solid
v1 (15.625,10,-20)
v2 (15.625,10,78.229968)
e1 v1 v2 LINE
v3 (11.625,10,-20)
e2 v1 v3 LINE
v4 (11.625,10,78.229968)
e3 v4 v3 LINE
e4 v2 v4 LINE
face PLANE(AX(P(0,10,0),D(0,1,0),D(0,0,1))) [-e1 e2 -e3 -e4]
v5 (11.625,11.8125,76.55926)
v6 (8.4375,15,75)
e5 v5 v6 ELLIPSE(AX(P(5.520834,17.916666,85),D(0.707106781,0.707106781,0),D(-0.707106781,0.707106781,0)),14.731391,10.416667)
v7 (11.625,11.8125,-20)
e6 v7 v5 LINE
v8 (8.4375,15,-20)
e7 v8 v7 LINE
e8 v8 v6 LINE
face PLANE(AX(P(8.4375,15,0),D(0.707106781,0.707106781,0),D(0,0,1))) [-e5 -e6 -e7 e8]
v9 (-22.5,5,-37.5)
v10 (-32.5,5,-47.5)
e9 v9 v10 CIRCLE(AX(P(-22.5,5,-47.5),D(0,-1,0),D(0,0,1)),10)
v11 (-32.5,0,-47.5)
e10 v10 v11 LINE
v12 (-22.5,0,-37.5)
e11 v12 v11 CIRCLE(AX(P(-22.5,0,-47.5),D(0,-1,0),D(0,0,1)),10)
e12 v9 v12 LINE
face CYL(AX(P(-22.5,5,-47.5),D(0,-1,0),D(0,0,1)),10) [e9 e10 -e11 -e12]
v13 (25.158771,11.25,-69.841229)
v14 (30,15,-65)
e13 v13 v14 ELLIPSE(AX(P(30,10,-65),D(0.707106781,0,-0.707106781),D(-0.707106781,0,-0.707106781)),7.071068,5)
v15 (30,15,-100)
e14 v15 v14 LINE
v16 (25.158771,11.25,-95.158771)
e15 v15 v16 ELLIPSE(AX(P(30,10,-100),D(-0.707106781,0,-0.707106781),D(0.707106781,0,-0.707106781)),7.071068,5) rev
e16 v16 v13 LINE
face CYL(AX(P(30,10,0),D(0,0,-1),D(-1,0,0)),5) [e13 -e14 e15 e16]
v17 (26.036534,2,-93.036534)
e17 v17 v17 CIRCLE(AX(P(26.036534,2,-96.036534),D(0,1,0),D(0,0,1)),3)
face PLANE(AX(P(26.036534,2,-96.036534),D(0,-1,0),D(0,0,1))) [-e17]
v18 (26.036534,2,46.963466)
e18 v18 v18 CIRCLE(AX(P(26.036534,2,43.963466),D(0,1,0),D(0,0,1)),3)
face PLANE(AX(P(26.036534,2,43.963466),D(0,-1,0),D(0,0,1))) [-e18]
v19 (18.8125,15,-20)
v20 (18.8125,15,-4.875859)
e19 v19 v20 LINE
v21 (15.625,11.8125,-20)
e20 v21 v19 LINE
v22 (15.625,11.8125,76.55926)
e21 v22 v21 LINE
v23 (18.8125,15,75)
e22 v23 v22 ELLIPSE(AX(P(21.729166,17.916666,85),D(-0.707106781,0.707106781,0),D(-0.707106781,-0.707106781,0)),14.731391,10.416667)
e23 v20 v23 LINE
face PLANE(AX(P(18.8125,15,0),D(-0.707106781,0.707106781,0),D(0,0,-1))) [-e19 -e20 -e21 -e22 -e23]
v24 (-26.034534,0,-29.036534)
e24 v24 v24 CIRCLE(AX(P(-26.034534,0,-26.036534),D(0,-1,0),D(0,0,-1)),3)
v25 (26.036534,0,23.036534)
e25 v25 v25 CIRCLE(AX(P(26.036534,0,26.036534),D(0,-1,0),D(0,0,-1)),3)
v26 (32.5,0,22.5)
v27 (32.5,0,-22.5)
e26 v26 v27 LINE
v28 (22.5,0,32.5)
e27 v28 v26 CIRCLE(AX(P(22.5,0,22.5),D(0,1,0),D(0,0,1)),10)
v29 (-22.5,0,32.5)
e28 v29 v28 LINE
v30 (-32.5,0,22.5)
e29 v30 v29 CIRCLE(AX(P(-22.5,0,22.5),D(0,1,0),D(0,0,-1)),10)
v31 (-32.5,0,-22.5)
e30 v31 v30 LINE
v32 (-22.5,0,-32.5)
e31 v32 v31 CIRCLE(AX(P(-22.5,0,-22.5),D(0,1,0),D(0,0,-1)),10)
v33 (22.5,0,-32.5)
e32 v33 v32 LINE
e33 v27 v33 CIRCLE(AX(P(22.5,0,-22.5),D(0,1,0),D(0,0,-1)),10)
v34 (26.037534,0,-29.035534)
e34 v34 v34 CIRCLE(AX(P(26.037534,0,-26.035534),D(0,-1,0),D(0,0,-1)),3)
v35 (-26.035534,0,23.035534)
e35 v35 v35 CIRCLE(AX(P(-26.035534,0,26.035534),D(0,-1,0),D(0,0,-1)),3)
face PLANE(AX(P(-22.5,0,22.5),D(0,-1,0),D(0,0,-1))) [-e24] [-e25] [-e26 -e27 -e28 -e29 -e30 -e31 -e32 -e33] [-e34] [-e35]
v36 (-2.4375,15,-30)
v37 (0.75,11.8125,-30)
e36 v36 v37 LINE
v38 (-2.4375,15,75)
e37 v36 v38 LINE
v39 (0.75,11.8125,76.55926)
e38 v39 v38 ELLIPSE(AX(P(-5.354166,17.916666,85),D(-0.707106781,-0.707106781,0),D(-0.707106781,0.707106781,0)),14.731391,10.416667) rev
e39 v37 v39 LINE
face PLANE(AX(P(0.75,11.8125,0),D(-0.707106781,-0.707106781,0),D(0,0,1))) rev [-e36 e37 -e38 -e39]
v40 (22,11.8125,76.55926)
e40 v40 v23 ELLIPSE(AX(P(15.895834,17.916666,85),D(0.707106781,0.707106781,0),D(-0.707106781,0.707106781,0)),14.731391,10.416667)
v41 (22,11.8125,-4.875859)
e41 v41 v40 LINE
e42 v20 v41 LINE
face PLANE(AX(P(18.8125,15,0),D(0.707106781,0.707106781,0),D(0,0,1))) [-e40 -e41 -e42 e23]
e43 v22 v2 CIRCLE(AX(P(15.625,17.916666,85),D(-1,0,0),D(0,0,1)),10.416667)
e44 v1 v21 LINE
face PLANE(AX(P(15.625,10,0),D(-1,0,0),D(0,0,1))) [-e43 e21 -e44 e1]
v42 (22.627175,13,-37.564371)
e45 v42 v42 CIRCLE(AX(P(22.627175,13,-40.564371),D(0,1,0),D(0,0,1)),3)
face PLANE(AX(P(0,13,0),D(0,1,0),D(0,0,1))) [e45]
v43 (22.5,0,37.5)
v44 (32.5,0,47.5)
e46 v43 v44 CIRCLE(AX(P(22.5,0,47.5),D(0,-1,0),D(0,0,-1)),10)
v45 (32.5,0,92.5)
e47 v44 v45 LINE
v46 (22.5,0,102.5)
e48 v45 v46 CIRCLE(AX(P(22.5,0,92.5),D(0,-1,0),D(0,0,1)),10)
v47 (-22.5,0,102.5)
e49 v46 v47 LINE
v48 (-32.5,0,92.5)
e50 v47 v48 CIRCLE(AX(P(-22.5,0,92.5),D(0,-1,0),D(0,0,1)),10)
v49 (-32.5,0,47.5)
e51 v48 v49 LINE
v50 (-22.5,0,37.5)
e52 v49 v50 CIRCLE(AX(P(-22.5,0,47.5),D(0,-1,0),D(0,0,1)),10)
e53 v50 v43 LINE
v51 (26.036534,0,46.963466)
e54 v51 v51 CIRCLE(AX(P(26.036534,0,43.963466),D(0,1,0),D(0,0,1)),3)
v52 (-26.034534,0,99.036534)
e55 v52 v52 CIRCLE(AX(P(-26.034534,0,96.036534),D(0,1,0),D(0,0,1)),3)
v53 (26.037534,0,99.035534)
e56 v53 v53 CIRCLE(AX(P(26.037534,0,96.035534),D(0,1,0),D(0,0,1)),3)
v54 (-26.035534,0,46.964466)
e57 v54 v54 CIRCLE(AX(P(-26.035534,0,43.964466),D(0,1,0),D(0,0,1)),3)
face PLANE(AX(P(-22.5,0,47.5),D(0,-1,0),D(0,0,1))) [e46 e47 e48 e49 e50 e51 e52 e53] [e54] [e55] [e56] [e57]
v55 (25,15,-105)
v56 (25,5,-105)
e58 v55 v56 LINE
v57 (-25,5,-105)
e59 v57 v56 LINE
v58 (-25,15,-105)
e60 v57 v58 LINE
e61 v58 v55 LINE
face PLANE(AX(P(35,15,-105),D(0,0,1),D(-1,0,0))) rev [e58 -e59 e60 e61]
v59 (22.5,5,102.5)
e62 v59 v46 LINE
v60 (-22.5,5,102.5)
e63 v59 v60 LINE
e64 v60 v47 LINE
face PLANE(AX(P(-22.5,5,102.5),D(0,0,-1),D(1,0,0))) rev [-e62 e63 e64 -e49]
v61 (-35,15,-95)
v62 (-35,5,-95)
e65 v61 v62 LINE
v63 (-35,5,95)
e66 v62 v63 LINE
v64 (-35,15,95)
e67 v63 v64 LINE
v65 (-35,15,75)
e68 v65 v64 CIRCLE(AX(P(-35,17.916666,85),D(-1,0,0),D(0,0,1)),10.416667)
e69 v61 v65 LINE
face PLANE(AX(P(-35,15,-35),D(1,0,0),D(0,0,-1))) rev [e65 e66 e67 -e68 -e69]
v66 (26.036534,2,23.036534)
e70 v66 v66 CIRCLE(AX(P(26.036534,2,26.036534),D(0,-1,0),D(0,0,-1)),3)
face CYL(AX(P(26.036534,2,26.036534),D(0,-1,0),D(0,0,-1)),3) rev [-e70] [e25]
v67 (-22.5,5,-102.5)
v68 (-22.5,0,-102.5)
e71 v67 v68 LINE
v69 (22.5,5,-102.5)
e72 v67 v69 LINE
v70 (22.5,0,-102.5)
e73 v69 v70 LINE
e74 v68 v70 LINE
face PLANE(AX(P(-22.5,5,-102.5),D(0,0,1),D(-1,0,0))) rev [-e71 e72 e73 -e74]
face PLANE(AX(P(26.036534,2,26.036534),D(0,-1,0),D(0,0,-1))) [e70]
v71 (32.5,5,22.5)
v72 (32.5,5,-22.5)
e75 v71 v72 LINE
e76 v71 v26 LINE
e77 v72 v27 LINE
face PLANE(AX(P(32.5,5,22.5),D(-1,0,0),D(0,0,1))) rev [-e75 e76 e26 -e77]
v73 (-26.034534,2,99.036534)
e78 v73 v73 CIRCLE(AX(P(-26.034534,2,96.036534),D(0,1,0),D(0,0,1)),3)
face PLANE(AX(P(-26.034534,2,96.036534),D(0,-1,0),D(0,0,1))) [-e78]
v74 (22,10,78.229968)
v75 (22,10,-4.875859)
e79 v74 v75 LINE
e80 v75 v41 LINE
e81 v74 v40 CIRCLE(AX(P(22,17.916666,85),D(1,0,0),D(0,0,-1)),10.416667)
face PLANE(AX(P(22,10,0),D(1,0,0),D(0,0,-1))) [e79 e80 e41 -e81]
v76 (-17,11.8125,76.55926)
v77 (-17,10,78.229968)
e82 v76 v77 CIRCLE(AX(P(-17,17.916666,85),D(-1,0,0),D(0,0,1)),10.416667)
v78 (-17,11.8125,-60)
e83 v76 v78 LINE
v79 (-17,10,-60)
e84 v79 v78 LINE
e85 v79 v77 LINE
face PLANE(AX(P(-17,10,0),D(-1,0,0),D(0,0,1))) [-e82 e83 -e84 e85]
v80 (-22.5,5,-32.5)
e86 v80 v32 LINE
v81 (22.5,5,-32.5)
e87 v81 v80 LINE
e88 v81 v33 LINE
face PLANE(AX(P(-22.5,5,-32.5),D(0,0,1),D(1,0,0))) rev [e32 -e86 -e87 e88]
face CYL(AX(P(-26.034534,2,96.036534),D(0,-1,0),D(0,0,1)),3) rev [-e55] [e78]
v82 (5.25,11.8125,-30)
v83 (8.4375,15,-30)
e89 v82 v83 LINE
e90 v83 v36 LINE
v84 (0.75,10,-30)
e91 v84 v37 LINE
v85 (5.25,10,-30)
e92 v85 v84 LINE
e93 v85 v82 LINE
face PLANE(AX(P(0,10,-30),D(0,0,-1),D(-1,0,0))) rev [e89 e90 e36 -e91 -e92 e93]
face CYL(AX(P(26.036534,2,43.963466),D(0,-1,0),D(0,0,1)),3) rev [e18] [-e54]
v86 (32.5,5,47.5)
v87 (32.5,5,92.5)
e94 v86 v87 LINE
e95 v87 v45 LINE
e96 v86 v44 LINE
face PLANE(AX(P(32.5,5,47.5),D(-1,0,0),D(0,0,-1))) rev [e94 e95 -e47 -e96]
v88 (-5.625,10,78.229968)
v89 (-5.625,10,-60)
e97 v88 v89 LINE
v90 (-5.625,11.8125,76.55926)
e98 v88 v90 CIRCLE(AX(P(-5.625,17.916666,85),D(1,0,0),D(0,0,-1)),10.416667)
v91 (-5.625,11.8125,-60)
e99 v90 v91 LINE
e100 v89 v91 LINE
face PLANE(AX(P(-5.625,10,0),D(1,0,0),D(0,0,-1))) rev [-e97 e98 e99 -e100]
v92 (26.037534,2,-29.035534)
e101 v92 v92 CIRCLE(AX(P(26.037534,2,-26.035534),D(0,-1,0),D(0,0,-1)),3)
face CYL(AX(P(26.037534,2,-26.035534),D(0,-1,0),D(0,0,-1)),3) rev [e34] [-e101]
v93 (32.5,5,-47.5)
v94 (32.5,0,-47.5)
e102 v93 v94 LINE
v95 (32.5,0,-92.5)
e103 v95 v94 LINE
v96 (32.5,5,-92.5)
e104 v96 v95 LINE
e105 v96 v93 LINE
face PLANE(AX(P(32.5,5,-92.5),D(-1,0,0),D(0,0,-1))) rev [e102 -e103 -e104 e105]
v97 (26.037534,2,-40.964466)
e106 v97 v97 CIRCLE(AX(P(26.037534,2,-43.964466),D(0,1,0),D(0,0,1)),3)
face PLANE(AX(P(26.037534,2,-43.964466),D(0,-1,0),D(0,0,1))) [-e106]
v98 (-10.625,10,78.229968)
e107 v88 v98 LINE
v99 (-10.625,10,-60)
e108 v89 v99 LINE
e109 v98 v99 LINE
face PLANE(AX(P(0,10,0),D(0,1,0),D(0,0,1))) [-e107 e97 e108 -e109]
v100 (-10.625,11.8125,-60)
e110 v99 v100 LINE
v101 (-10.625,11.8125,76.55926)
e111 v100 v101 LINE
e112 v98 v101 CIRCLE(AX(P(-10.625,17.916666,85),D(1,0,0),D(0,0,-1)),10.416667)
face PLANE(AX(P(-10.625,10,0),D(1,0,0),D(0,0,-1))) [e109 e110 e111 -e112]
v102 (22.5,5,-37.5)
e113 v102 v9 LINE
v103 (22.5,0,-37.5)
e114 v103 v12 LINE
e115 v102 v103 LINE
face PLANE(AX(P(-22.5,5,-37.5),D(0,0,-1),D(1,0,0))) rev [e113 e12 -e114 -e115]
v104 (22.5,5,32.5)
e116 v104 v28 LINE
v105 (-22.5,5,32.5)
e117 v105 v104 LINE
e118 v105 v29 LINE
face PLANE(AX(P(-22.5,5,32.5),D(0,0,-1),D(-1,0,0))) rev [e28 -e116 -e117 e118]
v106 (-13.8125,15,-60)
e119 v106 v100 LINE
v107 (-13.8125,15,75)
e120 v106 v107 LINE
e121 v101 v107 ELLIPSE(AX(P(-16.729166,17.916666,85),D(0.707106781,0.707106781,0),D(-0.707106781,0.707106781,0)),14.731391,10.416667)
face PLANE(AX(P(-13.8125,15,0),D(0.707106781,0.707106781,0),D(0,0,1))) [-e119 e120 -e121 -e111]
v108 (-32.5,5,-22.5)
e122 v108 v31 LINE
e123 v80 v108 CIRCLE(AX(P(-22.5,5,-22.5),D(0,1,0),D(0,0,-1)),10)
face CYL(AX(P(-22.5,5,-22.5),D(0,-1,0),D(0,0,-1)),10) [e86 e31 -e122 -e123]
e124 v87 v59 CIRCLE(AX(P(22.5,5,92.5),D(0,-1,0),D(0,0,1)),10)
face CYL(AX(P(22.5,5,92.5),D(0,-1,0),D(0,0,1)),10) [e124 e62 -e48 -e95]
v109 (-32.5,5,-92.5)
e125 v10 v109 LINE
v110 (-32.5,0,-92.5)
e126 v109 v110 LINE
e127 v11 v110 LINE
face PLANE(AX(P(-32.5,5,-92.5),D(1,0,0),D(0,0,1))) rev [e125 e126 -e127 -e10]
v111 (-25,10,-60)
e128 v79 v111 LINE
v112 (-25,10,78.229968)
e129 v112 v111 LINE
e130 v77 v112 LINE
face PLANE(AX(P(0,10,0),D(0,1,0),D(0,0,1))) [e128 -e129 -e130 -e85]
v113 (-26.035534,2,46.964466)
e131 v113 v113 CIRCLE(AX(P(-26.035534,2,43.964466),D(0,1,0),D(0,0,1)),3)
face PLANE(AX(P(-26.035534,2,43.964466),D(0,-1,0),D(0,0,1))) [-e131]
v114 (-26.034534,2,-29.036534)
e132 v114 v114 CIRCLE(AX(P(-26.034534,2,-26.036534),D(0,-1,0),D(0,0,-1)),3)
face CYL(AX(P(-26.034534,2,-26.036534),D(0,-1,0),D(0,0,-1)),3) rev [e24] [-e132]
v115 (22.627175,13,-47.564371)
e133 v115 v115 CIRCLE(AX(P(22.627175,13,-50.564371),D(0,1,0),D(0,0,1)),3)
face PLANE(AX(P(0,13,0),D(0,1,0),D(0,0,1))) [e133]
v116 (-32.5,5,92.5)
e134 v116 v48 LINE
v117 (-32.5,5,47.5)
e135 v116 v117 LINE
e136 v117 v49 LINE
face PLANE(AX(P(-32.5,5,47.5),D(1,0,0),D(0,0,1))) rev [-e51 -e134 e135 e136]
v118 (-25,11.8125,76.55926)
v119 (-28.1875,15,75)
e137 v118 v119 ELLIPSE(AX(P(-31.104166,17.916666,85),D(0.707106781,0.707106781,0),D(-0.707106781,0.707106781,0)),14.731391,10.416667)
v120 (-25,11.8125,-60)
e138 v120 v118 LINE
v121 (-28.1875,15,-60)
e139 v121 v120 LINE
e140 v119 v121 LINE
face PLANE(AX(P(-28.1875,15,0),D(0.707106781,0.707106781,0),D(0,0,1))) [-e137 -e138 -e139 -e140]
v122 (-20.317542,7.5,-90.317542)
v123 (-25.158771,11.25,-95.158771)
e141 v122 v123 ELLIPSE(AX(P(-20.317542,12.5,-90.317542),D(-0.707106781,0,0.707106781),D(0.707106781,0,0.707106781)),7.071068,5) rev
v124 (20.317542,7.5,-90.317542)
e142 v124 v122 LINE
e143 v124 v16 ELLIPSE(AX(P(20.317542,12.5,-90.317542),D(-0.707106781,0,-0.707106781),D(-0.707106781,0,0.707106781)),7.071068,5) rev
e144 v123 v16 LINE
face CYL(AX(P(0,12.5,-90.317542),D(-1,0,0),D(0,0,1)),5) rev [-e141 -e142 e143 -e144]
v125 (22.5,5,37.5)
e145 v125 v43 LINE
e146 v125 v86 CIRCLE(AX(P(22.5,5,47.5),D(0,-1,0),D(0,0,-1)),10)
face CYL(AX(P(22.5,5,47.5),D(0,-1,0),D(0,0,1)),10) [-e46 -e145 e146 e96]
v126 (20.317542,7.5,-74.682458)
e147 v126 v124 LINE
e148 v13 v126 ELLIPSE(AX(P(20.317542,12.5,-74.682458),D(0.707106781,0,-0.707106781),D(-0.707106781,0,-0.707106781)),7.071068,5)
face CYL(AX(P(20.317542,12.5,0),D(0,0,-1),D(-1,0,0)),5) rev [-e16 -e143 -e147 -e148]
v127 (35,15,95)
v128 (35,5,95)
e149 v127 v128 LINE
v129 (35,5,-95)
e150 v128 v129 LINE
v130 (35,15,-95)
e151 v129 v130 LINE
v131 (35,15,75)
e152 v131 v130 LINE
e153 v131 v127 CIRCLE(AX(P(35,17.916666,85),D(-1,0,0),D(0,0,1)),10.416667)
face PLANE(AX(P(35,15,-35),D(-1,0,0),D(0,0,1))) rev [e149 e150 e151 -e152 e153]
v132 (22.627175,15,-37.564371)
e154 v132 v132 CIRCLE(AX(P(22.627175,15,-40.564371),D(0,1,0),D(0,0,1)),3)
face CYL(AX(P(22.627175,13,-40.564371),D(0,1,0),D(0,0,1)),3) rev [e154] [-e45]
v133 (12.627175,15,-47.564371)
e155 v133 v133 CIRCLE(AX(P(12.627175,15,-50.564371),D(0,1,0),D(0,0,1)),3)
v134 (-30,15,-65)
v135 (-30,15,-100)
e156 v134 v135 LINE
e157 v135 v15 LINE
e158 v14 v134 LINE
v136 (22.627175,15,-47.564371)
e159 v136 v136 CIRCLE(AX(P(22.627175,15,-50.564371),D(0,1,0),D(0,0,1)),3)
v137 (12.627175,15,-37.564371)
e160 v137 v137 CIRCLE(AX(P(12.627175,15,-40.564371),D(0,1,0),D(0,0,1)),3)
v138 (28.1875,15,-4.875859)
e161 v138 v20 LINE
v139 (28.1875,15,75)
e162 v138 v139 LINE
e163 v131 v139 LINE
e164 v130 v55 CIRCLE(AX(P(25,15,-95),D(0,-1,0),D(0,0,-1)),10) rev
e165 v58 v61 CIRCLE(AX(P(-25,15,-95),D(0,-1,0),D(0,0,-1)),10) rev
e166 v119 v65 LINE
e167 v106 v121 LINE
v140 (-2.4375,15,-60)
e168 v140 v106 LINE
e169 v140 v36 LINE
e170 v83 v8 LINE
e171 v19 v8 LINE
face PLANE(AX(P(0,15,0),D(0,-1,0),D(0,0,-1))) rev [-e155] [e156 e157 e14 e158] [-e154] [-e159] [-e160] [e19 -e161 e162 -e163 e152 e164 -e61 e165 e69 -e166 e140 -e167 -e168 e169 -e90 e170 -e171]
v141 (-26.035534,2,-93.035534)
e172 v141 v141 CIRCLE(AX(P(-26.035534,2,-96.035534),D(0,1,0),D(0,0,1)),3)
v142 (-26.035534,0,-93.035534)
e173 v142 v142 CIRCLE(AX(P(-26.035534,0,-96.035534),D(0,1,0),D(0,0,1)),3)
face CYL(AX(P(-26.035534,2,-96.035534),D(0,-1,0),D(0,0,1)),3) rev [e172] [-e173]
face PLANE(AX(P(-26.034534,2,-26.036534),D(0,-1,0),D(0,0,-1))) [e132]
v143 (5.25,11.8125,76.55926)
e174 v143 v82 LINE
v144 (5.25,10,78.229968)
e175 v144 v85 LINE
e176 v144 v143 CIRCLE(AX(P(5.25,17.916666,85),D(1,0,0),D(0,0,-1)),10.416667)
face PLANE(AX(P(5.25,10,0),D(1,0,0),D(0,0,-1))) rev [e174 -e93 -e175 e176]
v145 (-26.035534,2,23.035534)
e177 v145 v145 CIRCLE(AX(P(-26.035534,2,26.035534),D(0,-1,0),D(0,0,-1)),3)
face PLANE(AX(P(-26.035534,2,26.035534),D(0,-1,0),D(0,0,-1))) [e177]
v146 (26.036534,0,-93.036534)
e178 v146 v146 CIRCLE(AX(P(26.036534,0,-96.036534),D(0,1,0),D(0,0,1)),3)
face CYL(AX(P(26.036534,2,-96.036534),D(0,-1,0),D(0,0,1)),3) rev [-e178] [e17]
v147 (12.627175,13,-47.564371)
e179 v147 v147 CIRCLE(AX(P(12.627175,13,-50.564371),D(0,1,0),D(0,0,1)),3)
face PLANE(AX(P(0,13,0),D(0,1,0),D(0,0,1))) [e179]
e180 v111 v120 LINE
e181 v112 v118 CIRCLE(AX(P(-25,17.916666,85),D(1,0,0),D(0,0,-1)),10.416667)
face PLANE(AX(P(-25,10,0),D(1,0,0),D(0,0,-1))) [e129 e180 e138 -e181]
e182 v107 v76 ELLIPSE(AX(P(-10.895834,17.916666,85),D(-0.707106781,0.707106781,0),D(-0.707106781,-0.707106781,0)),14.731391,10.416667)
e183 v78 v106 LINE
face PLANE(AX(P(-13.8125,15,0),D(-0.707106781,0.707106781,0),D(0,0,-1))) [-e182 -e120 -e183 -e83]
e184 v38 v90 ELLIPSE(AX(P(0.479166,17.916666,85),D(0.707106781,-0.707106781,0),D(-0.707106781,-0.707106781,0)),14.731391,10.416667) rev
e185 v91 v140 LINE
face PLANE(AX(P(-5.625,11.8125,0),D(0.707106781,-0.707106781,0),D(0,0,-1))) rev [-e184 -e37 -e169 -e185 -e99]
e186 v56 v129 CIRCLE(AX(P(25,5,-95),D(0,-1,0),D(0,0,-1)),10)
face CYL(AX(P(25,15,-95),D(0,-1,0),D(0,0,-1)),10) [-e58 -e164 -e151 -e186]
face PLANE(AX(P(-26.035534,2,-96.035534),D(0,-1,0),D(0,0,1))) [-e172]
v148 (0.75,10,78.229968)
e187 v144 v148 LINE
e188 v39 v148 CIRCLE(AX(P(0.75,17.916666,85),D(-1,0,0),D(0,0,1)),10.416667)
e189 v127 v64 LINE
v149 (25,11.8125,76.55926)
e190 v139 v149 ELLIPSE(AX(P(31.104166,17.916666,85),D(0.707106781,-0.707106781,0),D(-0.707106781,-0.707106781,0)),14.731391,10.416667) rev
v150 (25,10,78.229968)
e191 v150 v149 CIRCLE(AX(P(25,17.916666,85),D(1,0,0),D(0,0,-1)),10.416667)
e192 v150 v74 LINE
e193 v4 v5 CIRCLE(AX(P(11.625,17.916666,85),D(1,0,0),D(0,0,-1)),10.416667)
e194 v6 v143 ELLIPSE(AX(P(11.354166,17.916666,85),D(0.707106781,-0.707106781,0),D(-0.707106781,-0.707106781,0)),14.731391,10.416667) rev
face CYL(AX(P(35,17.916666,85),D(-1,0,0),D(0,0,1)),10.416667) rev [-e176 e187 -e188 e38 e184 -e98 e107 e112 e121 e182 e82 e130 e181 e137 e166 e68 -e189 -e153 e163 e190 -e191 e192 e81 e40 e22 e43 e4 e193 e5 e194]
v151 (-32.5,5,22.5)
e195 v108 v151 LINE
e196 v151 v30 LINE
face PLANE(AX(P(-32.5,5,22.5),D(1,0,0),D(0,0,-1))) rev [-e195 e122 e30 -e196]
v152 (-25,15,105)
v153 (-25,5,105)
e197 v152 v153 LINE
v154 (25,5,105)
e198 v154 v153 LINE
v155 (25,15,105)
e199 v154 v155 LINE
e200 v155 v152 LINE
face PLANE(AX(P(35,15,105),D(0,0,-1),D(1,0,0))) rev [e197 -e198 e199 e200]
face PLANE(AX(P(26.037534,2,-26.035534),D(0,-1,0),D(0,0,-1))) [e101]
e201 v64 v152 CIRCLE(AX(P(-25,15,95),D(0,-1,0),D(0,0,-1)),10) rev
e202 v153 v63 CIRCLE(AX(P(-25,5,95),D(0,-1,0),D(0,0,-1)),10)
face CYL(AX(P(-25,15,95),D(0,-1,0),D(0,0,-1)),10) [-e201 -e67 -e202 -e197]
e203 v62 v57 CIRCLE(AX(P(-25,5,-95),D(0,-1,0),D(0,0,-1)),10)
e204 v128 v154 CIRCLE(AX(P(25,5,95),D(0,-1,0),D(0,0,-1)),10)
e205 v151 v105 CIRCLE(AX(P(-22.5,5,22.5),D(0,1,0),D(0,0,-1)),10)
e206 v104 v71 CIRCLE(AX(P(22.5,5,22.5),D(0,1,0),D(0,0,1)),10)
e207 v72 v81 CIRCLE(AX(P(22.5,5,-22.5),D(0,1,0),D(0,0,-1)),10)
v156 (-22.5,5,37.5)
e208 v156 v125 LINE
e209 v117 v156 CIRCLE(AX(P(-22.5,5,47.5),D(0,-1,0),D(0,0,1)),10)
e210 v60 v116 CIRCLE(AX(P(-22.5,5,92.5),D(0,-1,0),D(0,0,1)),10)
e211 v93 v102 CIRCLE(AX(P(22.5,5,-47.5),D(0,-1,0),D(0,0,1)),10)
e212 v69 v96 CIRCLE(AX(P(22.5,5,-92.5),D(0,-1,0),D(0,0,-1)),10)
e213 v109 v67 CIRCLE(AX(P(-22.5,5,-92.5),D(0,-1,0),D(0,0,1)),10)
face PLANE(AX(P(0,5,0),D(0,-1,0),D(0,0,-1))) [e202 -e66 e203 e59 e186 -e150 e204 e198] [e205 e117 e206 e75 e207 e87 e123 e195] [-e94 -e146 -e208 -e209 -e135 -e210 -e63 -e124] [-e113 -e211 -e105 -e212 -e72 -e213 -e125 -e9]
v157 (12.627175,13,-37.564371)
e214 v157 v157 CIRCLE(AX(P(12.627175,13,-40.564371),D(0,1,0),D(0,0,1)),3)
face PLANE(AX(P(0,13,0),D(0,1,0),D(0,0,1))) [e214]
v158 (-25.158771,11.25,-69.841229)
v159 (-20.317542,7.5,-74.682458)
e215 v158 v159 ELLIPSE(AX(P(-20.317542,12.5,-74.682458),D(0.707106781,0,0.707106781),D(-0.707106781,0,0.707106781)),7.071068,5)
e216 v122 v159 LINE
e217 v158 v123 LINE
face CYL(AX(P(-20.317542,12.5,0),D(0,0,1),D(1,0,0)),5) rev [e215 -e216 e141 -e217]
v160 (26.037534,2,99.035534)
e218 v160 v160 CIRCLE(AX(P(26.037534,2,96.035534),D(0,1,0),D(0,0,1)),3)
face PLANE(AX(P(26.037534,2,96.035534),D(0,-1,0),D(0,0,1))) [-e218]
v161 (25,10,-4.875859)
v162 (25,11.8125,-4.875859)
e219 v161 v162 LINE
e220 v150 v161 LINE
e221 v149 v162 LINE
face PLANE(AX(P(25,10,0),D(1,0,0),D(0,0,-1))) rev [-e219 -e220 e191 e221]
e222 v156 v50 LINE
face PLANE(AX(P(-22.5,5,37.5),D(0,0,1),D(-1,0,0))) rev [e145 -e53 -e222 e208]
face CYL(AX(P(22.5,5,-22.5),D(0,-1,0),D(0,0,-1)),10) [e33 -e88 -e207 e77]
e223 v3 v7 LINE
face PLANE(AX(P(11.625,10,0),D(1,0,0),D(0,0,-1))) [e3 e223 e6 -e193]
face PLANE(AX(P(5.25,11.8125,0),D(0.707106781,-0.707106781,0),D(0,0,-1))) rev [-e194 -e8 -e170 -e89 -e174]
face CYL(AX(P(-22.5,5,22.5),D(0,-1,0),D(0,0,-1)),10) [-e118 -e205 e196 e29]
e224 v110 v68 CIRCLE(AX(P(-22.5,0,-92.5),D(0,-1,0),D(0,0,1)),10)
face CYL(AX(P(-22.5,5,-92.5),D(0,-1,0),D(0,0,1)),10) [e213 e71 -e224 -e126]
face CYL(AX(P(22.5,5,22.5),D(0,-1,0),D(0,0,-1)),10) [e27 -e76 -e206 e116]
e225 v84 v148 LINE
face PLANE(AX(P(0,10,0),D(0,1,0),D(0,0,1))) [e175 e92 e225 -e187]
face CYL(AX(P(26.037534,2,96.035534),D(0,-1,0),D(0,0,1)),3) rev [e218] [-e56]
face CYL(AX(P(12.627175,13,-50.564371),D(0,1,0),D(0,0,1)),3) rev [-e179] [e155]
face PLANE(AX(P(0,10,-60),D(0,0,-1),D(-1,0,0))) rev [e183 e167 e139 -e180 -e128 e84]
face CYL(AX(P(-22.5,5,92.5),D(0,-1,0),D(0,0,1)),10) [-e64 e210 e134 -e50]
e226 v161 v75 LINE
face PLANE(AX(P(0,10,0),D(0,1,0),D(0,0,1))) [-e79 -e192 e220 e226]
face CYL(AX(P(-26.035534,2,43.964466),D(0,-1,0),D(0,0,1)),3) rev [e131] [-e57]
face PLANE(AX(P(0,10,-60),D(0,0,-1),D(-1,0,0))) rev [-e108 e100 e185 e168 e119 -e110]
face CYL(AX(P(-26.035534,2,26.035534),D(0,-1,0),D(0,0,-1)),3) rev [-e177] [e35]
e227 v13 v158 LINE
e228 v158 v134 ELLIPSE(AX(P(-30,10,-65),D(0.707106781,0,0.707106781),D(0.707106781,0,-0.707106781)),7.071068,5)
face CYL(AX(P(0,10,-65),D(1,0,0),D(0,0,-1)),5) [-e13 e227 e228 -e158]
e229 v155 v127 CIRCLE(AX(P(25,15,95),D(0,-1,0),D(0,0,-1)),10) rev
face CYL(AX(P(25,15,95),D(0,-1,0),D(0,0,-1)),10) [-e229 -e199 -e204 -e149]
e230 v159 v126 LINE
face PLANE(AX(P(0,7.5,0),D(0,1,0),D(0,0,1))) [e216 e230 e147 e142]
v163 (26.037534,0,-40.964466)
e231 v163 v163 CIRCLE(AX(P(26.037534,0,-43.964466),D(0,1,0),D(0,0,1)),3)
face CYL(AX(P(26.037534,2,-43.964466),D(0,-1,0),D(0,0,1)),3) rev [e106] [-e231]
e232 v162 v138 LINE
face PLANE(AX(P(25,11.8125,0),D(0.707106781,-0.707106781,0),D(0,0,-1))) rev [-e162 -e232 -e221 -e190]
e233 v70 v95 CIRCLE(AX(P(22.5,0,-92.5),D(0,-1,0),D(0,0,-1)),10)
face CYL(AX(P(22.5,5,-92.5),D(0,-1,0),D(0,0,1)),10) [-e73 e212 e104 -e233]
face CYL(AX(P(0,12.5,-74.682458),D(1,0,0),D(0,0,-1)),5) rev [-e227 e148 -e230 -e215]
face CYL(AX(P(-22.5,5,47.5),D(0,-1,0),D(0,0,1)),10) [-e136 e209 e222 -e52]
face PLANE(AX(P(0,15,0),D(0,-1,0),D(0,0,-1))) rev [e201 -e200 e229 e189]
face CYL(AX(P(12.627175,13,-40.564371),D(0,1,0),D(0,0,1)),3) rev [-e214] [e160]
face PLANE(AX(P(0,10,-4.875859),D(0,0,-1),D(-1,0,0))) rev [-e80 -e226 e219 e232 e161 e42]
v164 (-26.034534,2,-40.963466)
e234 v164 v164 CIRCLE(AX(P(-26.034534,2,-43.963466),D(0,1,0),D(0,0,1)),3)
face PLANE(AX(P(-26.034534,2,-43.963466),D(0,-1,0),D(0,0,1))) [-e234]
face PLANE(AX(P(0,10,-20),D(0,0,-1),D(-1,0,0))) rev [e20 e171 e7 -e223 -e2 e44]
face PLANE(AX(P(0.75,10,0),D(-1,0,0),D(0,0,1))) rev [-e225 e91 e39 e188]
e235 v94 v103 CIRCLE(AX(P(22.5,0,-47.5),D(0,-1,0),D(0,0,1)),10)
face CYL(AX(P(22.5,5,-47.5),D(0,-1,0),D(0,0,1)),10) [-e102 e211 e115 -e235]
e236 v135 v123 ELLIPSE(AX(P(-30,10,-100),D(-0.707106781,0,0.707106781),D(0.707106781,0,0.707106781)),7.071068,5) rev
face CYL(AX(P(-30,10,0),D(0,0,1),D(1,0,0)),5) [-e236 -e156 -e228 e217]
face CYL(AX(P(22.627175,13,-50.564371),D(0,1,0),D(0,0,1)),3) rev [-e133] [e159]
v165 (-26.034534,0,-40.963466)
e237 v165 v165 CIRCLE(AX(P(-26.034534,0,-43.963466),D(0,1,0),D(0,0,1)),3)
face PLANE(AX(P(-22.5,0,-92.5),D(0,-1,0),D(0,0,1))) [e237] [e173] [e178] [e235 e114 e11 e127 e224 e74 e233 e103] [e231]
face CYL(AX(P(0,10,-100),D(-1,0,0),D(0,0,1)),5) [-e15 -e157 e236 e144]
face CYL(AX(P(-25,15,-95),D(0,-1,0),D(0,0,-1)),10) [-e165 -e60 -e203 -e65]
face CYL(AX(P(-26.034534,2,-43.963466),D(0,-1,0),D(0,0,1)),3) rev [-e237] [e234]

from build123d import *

# Parameters (mm, degrees)
BOSS_EXTRUDE4_DEPTH = 5
SKETCH7_R           = 3
CUT_EXTRUDE4_DEPTH  = 2
SKETCH8_W           = 70
SKETCH8_H           = 70
BOSS_EXTRUDE5_DEPTH = 10
MIRROR2_OUTLINE_R   = 3
MIRROR2_DEPTH       = 15
MIRROR2_START       = 5
MIRROR2_2_OUTLINE_W = 70
MIRROR2_2_OUTLINE_H = 70
MIRROR2_2_OUTLINE_R = 3
MIRROR2_2_DEPTH     = 10
MIRROR2_START_2     = 2
MIRROR2_3_OUTLINE_R = 3
MIRROR2_3_DEPTH     = 3
FILLET1_R           = 10
SKETCH9_W           = 8
SKETCH9_H           = 150
SKETCH9_W_2         = 5
SKETCH9_W_3         = 4.5
SKETCH9_H_2         = 120
SKETCH9_W_4         = 4
SKETCH9_H_3         = 110
SKETCH9_W_5         = 3
SKETCH9_H_4         = 95
CUT_EXTRUDE5_DEPTH  = 5
SKETCH13_W          = 8
SKETCH13_H          = 5
SKETCH13_W_2        = 5
SKETCH13_W_3        = 4.5
SKETCH13_W_4        = 4
SKETCH13_W_5        = 3
SKETCH13_H_2        = 4.875858763
CUT_EXTRUDE8_DEPTH  = 5
SKETCH14_W          = 50
SKETCH14_H          = 5
BOSS_EXTRUDE6_DEPTH = 5
CUT_EXTRUDE9_DEPTH  = 128.082650271
CHAMFER1_SIZE       = 3.1875
SKETCH18_W          = 50
SKETCH18_H          = 25
CUT_EXTRUDE11_DEPTH = 7.5
FILLET3_R           = 5
FILLET4_R           = 5
CUT_EXTRUDE12_DEPTH = 2


# Read off the part's stored shape, not the designer's step: Mirror2
with BuildPart() as part:
    # Sketch5 → Boss-Extrude4 (new body)
    with BuildSketch(Plane(origin=(0, 0, 0), x_dir=(1, 0, 0), z_dir=(0, 1, 0))):
        with BuildLine():
            Line((-22.5, -32.5), (22.5, -32.5))
            ThreePointArc((22.5, -32.5), (29.571067812, -29.571067812), (32.5, -22.5))
            Line((32.5, -22.5), (32.5, 22.5))
            ThreePointArc((32.5, 22.5), (29.571067812, 29.571067812), (22.5, 32.5))
            Line((22.5, 32.5), (-22.5, 32.5))
            ThreePointArc((-22.5, 32.5), (-29.571067812, 29.571067812), (-32.5, 22.5))
            Line((-32.5, 22.5), (-32.5, -22.5))
            ThreePointArc((-32.5, -22.5), (-29.571067812, -29.571067812), (-22.5, -32.5))
        make_face()
    extrude(amount=BOSS_EXTRUDE4_DEPTH)

    # Sketch7 → Cut-Extrude4 (cut)
    with BuildSketch(Plane.XZ):
        with Locations(Location((-26.035533906, 26.035533906, 0), (0, 0, 270))):
            Circle(SKETCH7_R)
        with Locations(Location((26.036533906, 26.036533906, 0), (0, 0, 270))):
            Circle(SKETCH7_R)
        with Locations(Location((26.037533906, -26.035533906, 0), (0, 0, 270))):
            Circle(SKETCH7_R)
        with Locations(Location((-26.034533906, -26.036533906, 0), (0, 0, 270))):
            Circle(SKETCH7_R)
    extrude(amount=-CUT_EXTRUDE4_DEPTH, mode=Mode.SUBTRACT)

    # Sketch8 → Boss-Extrude5 (add)
    with BuildSketch(Plane(origin=(0, 5, 0), x_dir=(1, 0, 0), z_dir=(0, 1, 0))):
        Rectangle(SKETCH8_W, SKETCH8_H)
    extrude(amount=BOSS_EXTRUDE5_DEPTH)



with BuildPart() as body_2:
    # Mirror2 outline → Mirror2 (new body)
    # profile 1 of 2: a face of its own
    with BuildSketch(Plane(origin=(0, 0, 0), x_dir=(1, 0, 0), z_dir=(0, 1, 0))):
        with BuildLine():
            Line((32.5, -92.5), (32.5, -47.5))
            ThreePointArc((32.5, -47.5), (29.571067812, -40.428932188), (22.5, -37.5))
            Line((22.5, -37.5), (-22.5, -37.5))
            ThreePointArc((-22.5, -37.5), (-29.571067812, -40.428932188), (-32.5, -47.5))
            Line((-32.5, -47.5), (-32.5, -92.5))
            ThreePointArc((-32.5, -92.5), (-29.571067812, -99.571067812), (-22.5, -102.5))
            Line((-22.5, -102.5), (22.5, -102.5))
            ThreePointArc((22.5, -102.5), (29.571067812, -99.571067812), (32.5, -92.5))
        make_face()
        with Locations((-26.034533906, -96.036533906)):
            Circle(MIRROR2_OUTLINE_R, mode=Mode.SUBTRACT)
        with Locations((-26.035533906, -43.964466094)):
            Circle(MIRROR2_OUTLINE_R, mode=Mode.SUBTRACT)
        with Locations((26.037533906, -96.035533906)):
            Circle(MIRROR2_OUTLINE_R, mode=Mode.SUBTRACT)
        with Locations((26.036533906, -43.963466094)):
            Circle(MIRROR2_OUTLINE_R, mode=Mode.SUBTRACT)
    # profile 2 of 2: a face of its own
    with BuildSketch(Plane(origin=(0, 0, 0), x_dir=(1, 0, 0), z_dir=(0, 1, 0))):
        with BuildLine():
            Line((32.5, 47.5), (32.5, 92.5))
            ThreePointArc((32.5, 92.5), (29.571067812, 99.571067812), (22.5, 102.5))
            Line((22.5, 102.5), (-22.5, 102.5))
            ThreePointArc((-22.5, 102.5), (-29.571067812, 99.571067812), (-32.5, 92.5))
            Line((-32.5, 92.5), (-32.5, 47.5))
            ThreePointArc((-32.5, 47.5), (-29.571067812, 40.428932188), (-22.5, 37.5))
            Line((-22.5, 37.5), (22.5, 37.5))
            ThreePointArc((22.5, 37.5), (29.571067812, 40.428932188), (32.5, 47.5))
        make_face()
        with Locations((-26.034533906, 43.963466094)):
            Circle(MIRROR2_OUTLINE_R, mode=Mode.SUBTRACT)
        with Locations((-26.035533906, 96.035533906)):
            Circle(MIRROR2_OUTLINE_R, mode=Mode.SUBTRACT)
        with Locations((26.037533906, 43.964466094)):
            Circle(MIRROR2_OUTLINE_R, mode=Mode.SUBTRACT)
        with Locations((26.036533906, 96.036533906)):
            Circle(MIRROR2_OUTLINE_R, mode=Mode.SUBTRACT)
    extrude(amount=MIRROR2_DEPTH)


with BuildPart() as part_1:
    add(part.part)

    add(body_2.part)  # Mirror2 2 merges body 2
    # Mirror2 2 outline → Mirror2 2 (add)
    # profile 1 of 10: a face of its own
    with BuildSketch(Plane(origin=(0, 0, 0), x_dir=(1, 0, 0), z_dir=(0, 1, 0)).offset(MIRROR2_START)):
        with Locations((0, -70)):
            Rectangle(MIRROR2_2_OUTLINE_W, MIRROR2_2_OUTLINE_H)
        with BuildLine():
            ThreePointArc((22.5, -37.5), (29.571067812, -40.428932188), (32.5, -47.5))
            Line((32.5, -47.5), (32.5, -92.5))
            ThreePointArc((32.5, -92.5), (29.571067812, -99.571067812), (22.5, -102.5))
            Line((22.5, -102.5), (-22.5, -102.5))
            ThreePointArc((-22.5, -102.5), (-29.571067812, -99.571067812), (-32.5, -92.5))
            Line((-32.5, -92.5), (-32.5, -47.5))
            ThreePointArc((-32.5, -47.5), (-29.571067812, -40.428932188), (-22.5, -37.5))
            Line((-22.5, -37.5), (22.5, -37.5))
        make_face(mode=Mode.SUBTRACT)
    # profile 2 of 10: a face of its own
    with BuildSketch(Plane(origin=(0, 0, 0), x_dir=(1, 0, 0), z_dir=(0, 1, 0)).offset(MIRROR2_START)):
        with Locations((0, 70)):
            Rectangle(MIRROR2_2_OUTLINE_W, MIRROR2_2_OUTLINE_H)
        with BuildLine():
            ThreePointArc((22.5, 102.5), (29.571067812, 99.571067812), (32.5, 92.5))
            Line((32.5, 92.5), (32.5, 47.5))
            ThreePointArc((32.5, 47.5), (29.571067812, 40.428932188), (22.5, 37.5))
            Line((22.5, 37.5), (-22.5, 37.5))
            ThreePointArc((-22.5, 37.5), (-29.571067812, 40.428932188), (-32.5, 47.5))
            Line((-32.5, 47.5), (-32.5, 92.5))
            ThreePointArc((-32.5, 92.5), (-29.571067812, 99.571067812), (-22.5, 102.5))
            Line((-22.5, 102.5), (22.5, 102.5))
        make_face(mode=Mode.SUBTRACT)
    # profile 3 of 10: a face of its own
    with BuildSketch(Plane(origin=(0, 0, 0), x_dir=(1, 0, 0), z_dir=(0, 1, 0)).offset(MIRROR2_START)):
        with Locations((-26.035533906, -43.964466094)):
            Circle(MIRROR2_2_OUTLINE_R)
    # profile 4 of 10: a face of its own
    with BuildSketch(Plane(origin=(0, 0, 0), x_dir=(1, 0, 0), z_dir=(0, 1, 0)).offset(MIRROR2_START)):
        with Locations((26.036533906, -43.963466094)):
            Circle(MIRROR2_2_OUTLINE_R)
    # profile 5 of 10: a face of its own
    with BuildSketch(Plane(origin=(0, 0, 0), x_dir=(1, 0, 0), z_dir=(0, 1, 0)).offset(MIRROR2_START)):
        with Locations((26.037533906, -96.035533906)):
            Circle(MIRROR2_2_OUTLINE_R)
    # profile 6 of 10: a face of its own
    with BuildSketch(Plane(origin=(0, 0, 0), x_dir=(1, 0, 0), z_dir=(0, 1, 0)).offset(MIRROR2_START)):
        with Locations((-26.034533906, -96.036533906)):
            Circle(MIRROR2_2_OUTLINE_R)
    # profile 7 of 10: a face of its own
    with BuildSketch(Plane(origin=(0, 0, 0), x_dir=(1, 0, 0), z_dir=(0, 1, 0)).offset(MIRROR2_START)):
        with Locations((-26.035533906, 96.035533906)):
            Circle(MIRROR2_2_OUTLINE_R)
    # profile 8 of 10: a face of its own
    with BuildSketch(Plane(origin=(0, 0, 0), x_dir=(1, 0, 0), z_dir=(0, 1, 0)).offset(MIRROR2_START)):
        with Locations((26.036533906, 96.036533906)):
            Circle(MIRROR2_2_OUTLINE_R)
    # profile 9 of 10: a face of its own
    with BuildSketch(Plane(origin=(0, 0, 0), x_dir=(1, 0, 0), z_dir=(0, 1, 0)).offset(MIRROR2_START)):
        with Locations((26.037533906, 43.964466094)):
            Circle(MIRROR2_2_OUTLINE_R)
    # profile 10 of 10: a face of its own
    with BuildSketch(Plane(origin=(0, 0, 0), x_dir=(1, 0, 0), z_dir=(0, 1, 0)).offset(MIRROR2_START)):
        with Locations((-26.034533906, 43.963466094)):
            Circle(MIRROR2_2_OUTLINE_R)
    extrude(amount=MIRROR2_2_DEPTH)

    # Mirror2 3 outline → Mirror2 3 (add)
    with BuildSketch(Plane(origin=(0, 0, 0), x_dir=(1, 0, 0), z_dir=(0, 1, 0)).offset(MIRROR2_START_2)):
        with Locations((-26.035533906, -43.964466094)):
            Circle(MIRROR2_3_OUTLINE_R)
        with Locations((26.036533906, -43.963466094)):
            Circle(MIRROR2_3_OUTLINE_R)
        with Locations((26.037533906, -96.035533906)):
            Circle(MIRROR2_3_OUTLINE_R)
        with Locations((-26.034533906, -96.036533906)):
            Circle(MIRROR2_3_OUTLINE_R)
        with Locations((-26.035533906, 96.035533906)):
            Circle(MIRROR2_3_OUTLINE_R)
        with Locations((26.036533906, 96.036533906)):
            Circle(MIRROR2_3_OUTLINE_R)
        with Locations((26.037533906, 43.964466094)):
            Circle(MIRROR2_3_OUTLINE_R)
        with Locations((-26.034533906, 43.963466094)):
            Circle(MIRROR2_3_OUTLINE_R)
    extrude(amount=MIRROR2_3_DEPTH)

    # Fillet1
    fillet1_edges = [part_1.edges().sort_by_distance(p)[0] for p in [
        (35, 10, 105),
        (-35, 10, 105),
        (-35, 10, -105),
        (35, 10, -105),
    ]]
    fillet(fillet1_edges, radius=FILLET1_R)

    # Sketch9 → Cut-Extrude5 (cut)
    with BuildSketch(Plane(origin=(0, 15, 0), x_dir=(1, 0, 0), z_dir=(0, 1, 0))):
        with Locations((-21, -20)):
            Rectangle(SKETCH9_W, SKETCH9_H)
        with Locations((-8.125, -20)):
            Rectangle(SKETCH9_W_2, SKETCH9_H)
        with Locations((3, -35)):
            Rectangle(SKETCH9_W_3, SKETCH9_H_2)
        with Locations((13.625, -40)):
            Rectangle(SKETCH9_W_4, SKETCH9_H_3)
        with Locations((23.5, -47.5)):
            Rectangle(SKETCH9_W_5, SKETCH9_H_4)
    extrude(amount=-CUT_EXTRUDE5_DEPTH, mode=Mode.SUBTRACT)

    # Sketch13 → Cut-Extrude8 (cut)
    with BuildSketch(Plane(origin=(0, 15, 0), x_dir=(1, 0, 0), z_dir=(0, 1, 0))):
        with Locations((-21, 57.5)):
            Rectangle(SKETCH13_W, SKETCH13_H)
        with Locations((-8.125, 57.5)):
            Rectangle(SKETCH13_W_2, SKETCH13_H)
        with Locations((3, 27.5)):
            Rectangle(SKETCH13_W_3, SKETCH13_H)
        with Locations((13.625, 17.5)):
            Rectangle(SKETCH13_W_4, SKETCH13_H)
        with Locations((23.5, 2.437929382)):
            Rectangle(SKETCH13_W_5, SKETCH13_H_2)
    extrude(amount=-CUT_EXTRUDE8_DEPTH, mode=Mode.SUBTRACT)

    # Sketch14 → Boss-Extrude6 (add)
    with BuildSketch(Plane(origin=(0, 15, 0), x_dir=(1, 0, 0), z_dir=(0, 1, 0))):
        with Locations((0, -92.5)):
            Rectangle(SKETCH14_W, SKETCH14_H)
    extrude(amount=-BOSS_EXTRUDE6_DEPTH)

    # Sketch12 → Cut-Extrude9 (cut, through all)
    with BuildSketch(Plane.ZY.offset(35)):
        with BuildLine():
            Line((95, 15), (85, 15))
            Line((85, 15), (75, 15))
            ThreePointArc((75, 15), (85, 7.499999803), (95, 15))
        make_face()
    extrude(amount=-CUT_EXTRUDE9_DEPTH, mode=Mode.SUBTRACT)

    # Chamfer1
    chamfer1_edges = [part_1.edges().sort_by_distance(p)[0] for p in [
        (-17, 15, 7.5),
        (0.75, 15, 22.5),
        (15.625, 15, 27.5),
        (-25, 15, 7.5),
        (-5.625, 15, 7.5),
        (-10.625, 15, 7.5),
        (5.25, 15, 22.5),
        (11.625, 15, 27.5),
        (25, 15, 35.062070618),
        (22, 15, 35.062070618),
    ]]
    chamfer(chamfer1_edges, length=CHAMFER1_SIZE - 0.0001)  # a hair under: the kernel refuses the full size

    # Sketch18 → Cut-Extrude11 (cut)
    with BuildSketch(Plane(origin=(0, 15, 0), x_dir=(1, 0, 0), z_dir=(0, 1, 0))):
        with Locations((0, 82.5)):
            Rectangle(SKETCH18_W, SKETCH18_H)
    extrude(amount=-CUT_EXTRUDE11_DEPTH, mode=Mode.SUBTRACT)

    # Fillet3
    fillet3_edges = [part_1.edges().sort_by_distance(p)[0] for p in [
        (0, 15, -70),
        (25, 15, -82.5),
        (0, 15, -95),
        (-25, 15, -82.5),
    ]]
    fillet(fillet3_edges, radius=FILLET3_R)

    # Fillet4
    fillet4_edges = [part_1.edges().sort_by_distance(p)[0] for p in [
        (-25, 7.5, -82.5),
        (0, 7.5, -95),
        (25, 7.5, -82.5),
        (0, 7.5, -70),
    ]]
    fillet(fillet4_edges, radius=FILLET4_R)

    # Sketch19 → Cut-Extrude12 (cut)
    with BuildSketch(Plane(origin=(0, 15, 0), x_dir=(1, 0, 0), z_dir=(0, 1, 0))):
        with BuildLine():
            ThreePointArc((22.627174595, 43.564371066), (20.505854252, 42.68569141), (19.627174595, 40.564371066))
            Line((19.627174595, 40.564371066), (22.627174595, 40.564371066))
            Line((22.627174595, 40.564371066), (22.627174595, 43.564371066))
        make_face()
        with BuildLine():
            Line((22.627174595, 40.564371066), (19.627174595, 40.564371066))
            ThreePointArc((19.627174595, 40.564371066), (22.627174595, 37.564371066), (25.627174595, 40.564371066))
            ThreePointArc((25.627174595, 40.564371066), (24.748494939, 42.68569141), (22.627174595, 43.564371066))
            Line((22.627174595, 43.564371066), (22.627174595, 40.564371066))
        make_face()
        with BuildLine():
            ThreePointArc((19.627174595, 50.564371066), (20.505854252, 48.443050723), (22.627174595, 47.564371066))
            Line((22.627174595, 47.564371066), (22.627174595, 50.564371066))
            Line((22.627174595, 50.564371066), (19.627174595, 50.564371066))
        make_face()
        with BuildLine():
            Line((22.627174595, 50.564371066), (22.627174595, 47.564371066))
            ThreePointArc((22.627174595, 47.564371066), (24.748494939, 48.443050723), (25.627174595, 50.564371066))
            ThreePointArc((25.627174595, 50.564371066), (22.627174595, 53.564371066), (19.627174595, 50.564371066))
            Line((19.627174595, 50.564371066), (22.627174595, 50.564371066))
        make_face()
        with BuildLine():
            ThreePointArc((15.627174595, 50.564371066), (10.505854252, 52.68569141), (12.627174595, 47.564371066))
            Line((12.627174595, 47.564371066), (12.627174595, 50.564371066))
            Line((12.627174595, 50.564371066), (15.627174595, 50.564371066))
        make_face()
        with BuildLine():
            Line((12.627174595, 50.564371066), (12.627174595, 47.564371066))
            ThreePointArc((12.627174595, 47.564371066), (14.748494939, 48.443050723), (15.627174595, 50.564371066))
            Line((15.627174595, 50.564371066), (12.627174595, 50.564371066))
        make_face()
        with BuildLine():
            Line((12.627174595, 43.564371066), (12.627174595, 40.564371066))
            Line((12.627174595, 40.564371066), (15.627174595, 40.564371066))
            ThreePointArc((15.627174595, 40.564371066), (14.748494939, 42.68569141), (12.627174595, 43.564371066))
        make_face()
        with BuildLine():
            Line((15.627174595, 40.564371066), (12.627174595, 40.564371066))
            Line((12.627174595, 40.564371066), (12.627174595, 43.564371066))
            ThreePointArc((12.627174595, 43.564371066), (10.505854252, 38.443050723), (15.627174595, 40.564371066))
        make_face()
    extrude(amount=-CUT_EXTRUDE12_DEPTH, mode=Mode.SUBTRACT)


solid = part_1.part
